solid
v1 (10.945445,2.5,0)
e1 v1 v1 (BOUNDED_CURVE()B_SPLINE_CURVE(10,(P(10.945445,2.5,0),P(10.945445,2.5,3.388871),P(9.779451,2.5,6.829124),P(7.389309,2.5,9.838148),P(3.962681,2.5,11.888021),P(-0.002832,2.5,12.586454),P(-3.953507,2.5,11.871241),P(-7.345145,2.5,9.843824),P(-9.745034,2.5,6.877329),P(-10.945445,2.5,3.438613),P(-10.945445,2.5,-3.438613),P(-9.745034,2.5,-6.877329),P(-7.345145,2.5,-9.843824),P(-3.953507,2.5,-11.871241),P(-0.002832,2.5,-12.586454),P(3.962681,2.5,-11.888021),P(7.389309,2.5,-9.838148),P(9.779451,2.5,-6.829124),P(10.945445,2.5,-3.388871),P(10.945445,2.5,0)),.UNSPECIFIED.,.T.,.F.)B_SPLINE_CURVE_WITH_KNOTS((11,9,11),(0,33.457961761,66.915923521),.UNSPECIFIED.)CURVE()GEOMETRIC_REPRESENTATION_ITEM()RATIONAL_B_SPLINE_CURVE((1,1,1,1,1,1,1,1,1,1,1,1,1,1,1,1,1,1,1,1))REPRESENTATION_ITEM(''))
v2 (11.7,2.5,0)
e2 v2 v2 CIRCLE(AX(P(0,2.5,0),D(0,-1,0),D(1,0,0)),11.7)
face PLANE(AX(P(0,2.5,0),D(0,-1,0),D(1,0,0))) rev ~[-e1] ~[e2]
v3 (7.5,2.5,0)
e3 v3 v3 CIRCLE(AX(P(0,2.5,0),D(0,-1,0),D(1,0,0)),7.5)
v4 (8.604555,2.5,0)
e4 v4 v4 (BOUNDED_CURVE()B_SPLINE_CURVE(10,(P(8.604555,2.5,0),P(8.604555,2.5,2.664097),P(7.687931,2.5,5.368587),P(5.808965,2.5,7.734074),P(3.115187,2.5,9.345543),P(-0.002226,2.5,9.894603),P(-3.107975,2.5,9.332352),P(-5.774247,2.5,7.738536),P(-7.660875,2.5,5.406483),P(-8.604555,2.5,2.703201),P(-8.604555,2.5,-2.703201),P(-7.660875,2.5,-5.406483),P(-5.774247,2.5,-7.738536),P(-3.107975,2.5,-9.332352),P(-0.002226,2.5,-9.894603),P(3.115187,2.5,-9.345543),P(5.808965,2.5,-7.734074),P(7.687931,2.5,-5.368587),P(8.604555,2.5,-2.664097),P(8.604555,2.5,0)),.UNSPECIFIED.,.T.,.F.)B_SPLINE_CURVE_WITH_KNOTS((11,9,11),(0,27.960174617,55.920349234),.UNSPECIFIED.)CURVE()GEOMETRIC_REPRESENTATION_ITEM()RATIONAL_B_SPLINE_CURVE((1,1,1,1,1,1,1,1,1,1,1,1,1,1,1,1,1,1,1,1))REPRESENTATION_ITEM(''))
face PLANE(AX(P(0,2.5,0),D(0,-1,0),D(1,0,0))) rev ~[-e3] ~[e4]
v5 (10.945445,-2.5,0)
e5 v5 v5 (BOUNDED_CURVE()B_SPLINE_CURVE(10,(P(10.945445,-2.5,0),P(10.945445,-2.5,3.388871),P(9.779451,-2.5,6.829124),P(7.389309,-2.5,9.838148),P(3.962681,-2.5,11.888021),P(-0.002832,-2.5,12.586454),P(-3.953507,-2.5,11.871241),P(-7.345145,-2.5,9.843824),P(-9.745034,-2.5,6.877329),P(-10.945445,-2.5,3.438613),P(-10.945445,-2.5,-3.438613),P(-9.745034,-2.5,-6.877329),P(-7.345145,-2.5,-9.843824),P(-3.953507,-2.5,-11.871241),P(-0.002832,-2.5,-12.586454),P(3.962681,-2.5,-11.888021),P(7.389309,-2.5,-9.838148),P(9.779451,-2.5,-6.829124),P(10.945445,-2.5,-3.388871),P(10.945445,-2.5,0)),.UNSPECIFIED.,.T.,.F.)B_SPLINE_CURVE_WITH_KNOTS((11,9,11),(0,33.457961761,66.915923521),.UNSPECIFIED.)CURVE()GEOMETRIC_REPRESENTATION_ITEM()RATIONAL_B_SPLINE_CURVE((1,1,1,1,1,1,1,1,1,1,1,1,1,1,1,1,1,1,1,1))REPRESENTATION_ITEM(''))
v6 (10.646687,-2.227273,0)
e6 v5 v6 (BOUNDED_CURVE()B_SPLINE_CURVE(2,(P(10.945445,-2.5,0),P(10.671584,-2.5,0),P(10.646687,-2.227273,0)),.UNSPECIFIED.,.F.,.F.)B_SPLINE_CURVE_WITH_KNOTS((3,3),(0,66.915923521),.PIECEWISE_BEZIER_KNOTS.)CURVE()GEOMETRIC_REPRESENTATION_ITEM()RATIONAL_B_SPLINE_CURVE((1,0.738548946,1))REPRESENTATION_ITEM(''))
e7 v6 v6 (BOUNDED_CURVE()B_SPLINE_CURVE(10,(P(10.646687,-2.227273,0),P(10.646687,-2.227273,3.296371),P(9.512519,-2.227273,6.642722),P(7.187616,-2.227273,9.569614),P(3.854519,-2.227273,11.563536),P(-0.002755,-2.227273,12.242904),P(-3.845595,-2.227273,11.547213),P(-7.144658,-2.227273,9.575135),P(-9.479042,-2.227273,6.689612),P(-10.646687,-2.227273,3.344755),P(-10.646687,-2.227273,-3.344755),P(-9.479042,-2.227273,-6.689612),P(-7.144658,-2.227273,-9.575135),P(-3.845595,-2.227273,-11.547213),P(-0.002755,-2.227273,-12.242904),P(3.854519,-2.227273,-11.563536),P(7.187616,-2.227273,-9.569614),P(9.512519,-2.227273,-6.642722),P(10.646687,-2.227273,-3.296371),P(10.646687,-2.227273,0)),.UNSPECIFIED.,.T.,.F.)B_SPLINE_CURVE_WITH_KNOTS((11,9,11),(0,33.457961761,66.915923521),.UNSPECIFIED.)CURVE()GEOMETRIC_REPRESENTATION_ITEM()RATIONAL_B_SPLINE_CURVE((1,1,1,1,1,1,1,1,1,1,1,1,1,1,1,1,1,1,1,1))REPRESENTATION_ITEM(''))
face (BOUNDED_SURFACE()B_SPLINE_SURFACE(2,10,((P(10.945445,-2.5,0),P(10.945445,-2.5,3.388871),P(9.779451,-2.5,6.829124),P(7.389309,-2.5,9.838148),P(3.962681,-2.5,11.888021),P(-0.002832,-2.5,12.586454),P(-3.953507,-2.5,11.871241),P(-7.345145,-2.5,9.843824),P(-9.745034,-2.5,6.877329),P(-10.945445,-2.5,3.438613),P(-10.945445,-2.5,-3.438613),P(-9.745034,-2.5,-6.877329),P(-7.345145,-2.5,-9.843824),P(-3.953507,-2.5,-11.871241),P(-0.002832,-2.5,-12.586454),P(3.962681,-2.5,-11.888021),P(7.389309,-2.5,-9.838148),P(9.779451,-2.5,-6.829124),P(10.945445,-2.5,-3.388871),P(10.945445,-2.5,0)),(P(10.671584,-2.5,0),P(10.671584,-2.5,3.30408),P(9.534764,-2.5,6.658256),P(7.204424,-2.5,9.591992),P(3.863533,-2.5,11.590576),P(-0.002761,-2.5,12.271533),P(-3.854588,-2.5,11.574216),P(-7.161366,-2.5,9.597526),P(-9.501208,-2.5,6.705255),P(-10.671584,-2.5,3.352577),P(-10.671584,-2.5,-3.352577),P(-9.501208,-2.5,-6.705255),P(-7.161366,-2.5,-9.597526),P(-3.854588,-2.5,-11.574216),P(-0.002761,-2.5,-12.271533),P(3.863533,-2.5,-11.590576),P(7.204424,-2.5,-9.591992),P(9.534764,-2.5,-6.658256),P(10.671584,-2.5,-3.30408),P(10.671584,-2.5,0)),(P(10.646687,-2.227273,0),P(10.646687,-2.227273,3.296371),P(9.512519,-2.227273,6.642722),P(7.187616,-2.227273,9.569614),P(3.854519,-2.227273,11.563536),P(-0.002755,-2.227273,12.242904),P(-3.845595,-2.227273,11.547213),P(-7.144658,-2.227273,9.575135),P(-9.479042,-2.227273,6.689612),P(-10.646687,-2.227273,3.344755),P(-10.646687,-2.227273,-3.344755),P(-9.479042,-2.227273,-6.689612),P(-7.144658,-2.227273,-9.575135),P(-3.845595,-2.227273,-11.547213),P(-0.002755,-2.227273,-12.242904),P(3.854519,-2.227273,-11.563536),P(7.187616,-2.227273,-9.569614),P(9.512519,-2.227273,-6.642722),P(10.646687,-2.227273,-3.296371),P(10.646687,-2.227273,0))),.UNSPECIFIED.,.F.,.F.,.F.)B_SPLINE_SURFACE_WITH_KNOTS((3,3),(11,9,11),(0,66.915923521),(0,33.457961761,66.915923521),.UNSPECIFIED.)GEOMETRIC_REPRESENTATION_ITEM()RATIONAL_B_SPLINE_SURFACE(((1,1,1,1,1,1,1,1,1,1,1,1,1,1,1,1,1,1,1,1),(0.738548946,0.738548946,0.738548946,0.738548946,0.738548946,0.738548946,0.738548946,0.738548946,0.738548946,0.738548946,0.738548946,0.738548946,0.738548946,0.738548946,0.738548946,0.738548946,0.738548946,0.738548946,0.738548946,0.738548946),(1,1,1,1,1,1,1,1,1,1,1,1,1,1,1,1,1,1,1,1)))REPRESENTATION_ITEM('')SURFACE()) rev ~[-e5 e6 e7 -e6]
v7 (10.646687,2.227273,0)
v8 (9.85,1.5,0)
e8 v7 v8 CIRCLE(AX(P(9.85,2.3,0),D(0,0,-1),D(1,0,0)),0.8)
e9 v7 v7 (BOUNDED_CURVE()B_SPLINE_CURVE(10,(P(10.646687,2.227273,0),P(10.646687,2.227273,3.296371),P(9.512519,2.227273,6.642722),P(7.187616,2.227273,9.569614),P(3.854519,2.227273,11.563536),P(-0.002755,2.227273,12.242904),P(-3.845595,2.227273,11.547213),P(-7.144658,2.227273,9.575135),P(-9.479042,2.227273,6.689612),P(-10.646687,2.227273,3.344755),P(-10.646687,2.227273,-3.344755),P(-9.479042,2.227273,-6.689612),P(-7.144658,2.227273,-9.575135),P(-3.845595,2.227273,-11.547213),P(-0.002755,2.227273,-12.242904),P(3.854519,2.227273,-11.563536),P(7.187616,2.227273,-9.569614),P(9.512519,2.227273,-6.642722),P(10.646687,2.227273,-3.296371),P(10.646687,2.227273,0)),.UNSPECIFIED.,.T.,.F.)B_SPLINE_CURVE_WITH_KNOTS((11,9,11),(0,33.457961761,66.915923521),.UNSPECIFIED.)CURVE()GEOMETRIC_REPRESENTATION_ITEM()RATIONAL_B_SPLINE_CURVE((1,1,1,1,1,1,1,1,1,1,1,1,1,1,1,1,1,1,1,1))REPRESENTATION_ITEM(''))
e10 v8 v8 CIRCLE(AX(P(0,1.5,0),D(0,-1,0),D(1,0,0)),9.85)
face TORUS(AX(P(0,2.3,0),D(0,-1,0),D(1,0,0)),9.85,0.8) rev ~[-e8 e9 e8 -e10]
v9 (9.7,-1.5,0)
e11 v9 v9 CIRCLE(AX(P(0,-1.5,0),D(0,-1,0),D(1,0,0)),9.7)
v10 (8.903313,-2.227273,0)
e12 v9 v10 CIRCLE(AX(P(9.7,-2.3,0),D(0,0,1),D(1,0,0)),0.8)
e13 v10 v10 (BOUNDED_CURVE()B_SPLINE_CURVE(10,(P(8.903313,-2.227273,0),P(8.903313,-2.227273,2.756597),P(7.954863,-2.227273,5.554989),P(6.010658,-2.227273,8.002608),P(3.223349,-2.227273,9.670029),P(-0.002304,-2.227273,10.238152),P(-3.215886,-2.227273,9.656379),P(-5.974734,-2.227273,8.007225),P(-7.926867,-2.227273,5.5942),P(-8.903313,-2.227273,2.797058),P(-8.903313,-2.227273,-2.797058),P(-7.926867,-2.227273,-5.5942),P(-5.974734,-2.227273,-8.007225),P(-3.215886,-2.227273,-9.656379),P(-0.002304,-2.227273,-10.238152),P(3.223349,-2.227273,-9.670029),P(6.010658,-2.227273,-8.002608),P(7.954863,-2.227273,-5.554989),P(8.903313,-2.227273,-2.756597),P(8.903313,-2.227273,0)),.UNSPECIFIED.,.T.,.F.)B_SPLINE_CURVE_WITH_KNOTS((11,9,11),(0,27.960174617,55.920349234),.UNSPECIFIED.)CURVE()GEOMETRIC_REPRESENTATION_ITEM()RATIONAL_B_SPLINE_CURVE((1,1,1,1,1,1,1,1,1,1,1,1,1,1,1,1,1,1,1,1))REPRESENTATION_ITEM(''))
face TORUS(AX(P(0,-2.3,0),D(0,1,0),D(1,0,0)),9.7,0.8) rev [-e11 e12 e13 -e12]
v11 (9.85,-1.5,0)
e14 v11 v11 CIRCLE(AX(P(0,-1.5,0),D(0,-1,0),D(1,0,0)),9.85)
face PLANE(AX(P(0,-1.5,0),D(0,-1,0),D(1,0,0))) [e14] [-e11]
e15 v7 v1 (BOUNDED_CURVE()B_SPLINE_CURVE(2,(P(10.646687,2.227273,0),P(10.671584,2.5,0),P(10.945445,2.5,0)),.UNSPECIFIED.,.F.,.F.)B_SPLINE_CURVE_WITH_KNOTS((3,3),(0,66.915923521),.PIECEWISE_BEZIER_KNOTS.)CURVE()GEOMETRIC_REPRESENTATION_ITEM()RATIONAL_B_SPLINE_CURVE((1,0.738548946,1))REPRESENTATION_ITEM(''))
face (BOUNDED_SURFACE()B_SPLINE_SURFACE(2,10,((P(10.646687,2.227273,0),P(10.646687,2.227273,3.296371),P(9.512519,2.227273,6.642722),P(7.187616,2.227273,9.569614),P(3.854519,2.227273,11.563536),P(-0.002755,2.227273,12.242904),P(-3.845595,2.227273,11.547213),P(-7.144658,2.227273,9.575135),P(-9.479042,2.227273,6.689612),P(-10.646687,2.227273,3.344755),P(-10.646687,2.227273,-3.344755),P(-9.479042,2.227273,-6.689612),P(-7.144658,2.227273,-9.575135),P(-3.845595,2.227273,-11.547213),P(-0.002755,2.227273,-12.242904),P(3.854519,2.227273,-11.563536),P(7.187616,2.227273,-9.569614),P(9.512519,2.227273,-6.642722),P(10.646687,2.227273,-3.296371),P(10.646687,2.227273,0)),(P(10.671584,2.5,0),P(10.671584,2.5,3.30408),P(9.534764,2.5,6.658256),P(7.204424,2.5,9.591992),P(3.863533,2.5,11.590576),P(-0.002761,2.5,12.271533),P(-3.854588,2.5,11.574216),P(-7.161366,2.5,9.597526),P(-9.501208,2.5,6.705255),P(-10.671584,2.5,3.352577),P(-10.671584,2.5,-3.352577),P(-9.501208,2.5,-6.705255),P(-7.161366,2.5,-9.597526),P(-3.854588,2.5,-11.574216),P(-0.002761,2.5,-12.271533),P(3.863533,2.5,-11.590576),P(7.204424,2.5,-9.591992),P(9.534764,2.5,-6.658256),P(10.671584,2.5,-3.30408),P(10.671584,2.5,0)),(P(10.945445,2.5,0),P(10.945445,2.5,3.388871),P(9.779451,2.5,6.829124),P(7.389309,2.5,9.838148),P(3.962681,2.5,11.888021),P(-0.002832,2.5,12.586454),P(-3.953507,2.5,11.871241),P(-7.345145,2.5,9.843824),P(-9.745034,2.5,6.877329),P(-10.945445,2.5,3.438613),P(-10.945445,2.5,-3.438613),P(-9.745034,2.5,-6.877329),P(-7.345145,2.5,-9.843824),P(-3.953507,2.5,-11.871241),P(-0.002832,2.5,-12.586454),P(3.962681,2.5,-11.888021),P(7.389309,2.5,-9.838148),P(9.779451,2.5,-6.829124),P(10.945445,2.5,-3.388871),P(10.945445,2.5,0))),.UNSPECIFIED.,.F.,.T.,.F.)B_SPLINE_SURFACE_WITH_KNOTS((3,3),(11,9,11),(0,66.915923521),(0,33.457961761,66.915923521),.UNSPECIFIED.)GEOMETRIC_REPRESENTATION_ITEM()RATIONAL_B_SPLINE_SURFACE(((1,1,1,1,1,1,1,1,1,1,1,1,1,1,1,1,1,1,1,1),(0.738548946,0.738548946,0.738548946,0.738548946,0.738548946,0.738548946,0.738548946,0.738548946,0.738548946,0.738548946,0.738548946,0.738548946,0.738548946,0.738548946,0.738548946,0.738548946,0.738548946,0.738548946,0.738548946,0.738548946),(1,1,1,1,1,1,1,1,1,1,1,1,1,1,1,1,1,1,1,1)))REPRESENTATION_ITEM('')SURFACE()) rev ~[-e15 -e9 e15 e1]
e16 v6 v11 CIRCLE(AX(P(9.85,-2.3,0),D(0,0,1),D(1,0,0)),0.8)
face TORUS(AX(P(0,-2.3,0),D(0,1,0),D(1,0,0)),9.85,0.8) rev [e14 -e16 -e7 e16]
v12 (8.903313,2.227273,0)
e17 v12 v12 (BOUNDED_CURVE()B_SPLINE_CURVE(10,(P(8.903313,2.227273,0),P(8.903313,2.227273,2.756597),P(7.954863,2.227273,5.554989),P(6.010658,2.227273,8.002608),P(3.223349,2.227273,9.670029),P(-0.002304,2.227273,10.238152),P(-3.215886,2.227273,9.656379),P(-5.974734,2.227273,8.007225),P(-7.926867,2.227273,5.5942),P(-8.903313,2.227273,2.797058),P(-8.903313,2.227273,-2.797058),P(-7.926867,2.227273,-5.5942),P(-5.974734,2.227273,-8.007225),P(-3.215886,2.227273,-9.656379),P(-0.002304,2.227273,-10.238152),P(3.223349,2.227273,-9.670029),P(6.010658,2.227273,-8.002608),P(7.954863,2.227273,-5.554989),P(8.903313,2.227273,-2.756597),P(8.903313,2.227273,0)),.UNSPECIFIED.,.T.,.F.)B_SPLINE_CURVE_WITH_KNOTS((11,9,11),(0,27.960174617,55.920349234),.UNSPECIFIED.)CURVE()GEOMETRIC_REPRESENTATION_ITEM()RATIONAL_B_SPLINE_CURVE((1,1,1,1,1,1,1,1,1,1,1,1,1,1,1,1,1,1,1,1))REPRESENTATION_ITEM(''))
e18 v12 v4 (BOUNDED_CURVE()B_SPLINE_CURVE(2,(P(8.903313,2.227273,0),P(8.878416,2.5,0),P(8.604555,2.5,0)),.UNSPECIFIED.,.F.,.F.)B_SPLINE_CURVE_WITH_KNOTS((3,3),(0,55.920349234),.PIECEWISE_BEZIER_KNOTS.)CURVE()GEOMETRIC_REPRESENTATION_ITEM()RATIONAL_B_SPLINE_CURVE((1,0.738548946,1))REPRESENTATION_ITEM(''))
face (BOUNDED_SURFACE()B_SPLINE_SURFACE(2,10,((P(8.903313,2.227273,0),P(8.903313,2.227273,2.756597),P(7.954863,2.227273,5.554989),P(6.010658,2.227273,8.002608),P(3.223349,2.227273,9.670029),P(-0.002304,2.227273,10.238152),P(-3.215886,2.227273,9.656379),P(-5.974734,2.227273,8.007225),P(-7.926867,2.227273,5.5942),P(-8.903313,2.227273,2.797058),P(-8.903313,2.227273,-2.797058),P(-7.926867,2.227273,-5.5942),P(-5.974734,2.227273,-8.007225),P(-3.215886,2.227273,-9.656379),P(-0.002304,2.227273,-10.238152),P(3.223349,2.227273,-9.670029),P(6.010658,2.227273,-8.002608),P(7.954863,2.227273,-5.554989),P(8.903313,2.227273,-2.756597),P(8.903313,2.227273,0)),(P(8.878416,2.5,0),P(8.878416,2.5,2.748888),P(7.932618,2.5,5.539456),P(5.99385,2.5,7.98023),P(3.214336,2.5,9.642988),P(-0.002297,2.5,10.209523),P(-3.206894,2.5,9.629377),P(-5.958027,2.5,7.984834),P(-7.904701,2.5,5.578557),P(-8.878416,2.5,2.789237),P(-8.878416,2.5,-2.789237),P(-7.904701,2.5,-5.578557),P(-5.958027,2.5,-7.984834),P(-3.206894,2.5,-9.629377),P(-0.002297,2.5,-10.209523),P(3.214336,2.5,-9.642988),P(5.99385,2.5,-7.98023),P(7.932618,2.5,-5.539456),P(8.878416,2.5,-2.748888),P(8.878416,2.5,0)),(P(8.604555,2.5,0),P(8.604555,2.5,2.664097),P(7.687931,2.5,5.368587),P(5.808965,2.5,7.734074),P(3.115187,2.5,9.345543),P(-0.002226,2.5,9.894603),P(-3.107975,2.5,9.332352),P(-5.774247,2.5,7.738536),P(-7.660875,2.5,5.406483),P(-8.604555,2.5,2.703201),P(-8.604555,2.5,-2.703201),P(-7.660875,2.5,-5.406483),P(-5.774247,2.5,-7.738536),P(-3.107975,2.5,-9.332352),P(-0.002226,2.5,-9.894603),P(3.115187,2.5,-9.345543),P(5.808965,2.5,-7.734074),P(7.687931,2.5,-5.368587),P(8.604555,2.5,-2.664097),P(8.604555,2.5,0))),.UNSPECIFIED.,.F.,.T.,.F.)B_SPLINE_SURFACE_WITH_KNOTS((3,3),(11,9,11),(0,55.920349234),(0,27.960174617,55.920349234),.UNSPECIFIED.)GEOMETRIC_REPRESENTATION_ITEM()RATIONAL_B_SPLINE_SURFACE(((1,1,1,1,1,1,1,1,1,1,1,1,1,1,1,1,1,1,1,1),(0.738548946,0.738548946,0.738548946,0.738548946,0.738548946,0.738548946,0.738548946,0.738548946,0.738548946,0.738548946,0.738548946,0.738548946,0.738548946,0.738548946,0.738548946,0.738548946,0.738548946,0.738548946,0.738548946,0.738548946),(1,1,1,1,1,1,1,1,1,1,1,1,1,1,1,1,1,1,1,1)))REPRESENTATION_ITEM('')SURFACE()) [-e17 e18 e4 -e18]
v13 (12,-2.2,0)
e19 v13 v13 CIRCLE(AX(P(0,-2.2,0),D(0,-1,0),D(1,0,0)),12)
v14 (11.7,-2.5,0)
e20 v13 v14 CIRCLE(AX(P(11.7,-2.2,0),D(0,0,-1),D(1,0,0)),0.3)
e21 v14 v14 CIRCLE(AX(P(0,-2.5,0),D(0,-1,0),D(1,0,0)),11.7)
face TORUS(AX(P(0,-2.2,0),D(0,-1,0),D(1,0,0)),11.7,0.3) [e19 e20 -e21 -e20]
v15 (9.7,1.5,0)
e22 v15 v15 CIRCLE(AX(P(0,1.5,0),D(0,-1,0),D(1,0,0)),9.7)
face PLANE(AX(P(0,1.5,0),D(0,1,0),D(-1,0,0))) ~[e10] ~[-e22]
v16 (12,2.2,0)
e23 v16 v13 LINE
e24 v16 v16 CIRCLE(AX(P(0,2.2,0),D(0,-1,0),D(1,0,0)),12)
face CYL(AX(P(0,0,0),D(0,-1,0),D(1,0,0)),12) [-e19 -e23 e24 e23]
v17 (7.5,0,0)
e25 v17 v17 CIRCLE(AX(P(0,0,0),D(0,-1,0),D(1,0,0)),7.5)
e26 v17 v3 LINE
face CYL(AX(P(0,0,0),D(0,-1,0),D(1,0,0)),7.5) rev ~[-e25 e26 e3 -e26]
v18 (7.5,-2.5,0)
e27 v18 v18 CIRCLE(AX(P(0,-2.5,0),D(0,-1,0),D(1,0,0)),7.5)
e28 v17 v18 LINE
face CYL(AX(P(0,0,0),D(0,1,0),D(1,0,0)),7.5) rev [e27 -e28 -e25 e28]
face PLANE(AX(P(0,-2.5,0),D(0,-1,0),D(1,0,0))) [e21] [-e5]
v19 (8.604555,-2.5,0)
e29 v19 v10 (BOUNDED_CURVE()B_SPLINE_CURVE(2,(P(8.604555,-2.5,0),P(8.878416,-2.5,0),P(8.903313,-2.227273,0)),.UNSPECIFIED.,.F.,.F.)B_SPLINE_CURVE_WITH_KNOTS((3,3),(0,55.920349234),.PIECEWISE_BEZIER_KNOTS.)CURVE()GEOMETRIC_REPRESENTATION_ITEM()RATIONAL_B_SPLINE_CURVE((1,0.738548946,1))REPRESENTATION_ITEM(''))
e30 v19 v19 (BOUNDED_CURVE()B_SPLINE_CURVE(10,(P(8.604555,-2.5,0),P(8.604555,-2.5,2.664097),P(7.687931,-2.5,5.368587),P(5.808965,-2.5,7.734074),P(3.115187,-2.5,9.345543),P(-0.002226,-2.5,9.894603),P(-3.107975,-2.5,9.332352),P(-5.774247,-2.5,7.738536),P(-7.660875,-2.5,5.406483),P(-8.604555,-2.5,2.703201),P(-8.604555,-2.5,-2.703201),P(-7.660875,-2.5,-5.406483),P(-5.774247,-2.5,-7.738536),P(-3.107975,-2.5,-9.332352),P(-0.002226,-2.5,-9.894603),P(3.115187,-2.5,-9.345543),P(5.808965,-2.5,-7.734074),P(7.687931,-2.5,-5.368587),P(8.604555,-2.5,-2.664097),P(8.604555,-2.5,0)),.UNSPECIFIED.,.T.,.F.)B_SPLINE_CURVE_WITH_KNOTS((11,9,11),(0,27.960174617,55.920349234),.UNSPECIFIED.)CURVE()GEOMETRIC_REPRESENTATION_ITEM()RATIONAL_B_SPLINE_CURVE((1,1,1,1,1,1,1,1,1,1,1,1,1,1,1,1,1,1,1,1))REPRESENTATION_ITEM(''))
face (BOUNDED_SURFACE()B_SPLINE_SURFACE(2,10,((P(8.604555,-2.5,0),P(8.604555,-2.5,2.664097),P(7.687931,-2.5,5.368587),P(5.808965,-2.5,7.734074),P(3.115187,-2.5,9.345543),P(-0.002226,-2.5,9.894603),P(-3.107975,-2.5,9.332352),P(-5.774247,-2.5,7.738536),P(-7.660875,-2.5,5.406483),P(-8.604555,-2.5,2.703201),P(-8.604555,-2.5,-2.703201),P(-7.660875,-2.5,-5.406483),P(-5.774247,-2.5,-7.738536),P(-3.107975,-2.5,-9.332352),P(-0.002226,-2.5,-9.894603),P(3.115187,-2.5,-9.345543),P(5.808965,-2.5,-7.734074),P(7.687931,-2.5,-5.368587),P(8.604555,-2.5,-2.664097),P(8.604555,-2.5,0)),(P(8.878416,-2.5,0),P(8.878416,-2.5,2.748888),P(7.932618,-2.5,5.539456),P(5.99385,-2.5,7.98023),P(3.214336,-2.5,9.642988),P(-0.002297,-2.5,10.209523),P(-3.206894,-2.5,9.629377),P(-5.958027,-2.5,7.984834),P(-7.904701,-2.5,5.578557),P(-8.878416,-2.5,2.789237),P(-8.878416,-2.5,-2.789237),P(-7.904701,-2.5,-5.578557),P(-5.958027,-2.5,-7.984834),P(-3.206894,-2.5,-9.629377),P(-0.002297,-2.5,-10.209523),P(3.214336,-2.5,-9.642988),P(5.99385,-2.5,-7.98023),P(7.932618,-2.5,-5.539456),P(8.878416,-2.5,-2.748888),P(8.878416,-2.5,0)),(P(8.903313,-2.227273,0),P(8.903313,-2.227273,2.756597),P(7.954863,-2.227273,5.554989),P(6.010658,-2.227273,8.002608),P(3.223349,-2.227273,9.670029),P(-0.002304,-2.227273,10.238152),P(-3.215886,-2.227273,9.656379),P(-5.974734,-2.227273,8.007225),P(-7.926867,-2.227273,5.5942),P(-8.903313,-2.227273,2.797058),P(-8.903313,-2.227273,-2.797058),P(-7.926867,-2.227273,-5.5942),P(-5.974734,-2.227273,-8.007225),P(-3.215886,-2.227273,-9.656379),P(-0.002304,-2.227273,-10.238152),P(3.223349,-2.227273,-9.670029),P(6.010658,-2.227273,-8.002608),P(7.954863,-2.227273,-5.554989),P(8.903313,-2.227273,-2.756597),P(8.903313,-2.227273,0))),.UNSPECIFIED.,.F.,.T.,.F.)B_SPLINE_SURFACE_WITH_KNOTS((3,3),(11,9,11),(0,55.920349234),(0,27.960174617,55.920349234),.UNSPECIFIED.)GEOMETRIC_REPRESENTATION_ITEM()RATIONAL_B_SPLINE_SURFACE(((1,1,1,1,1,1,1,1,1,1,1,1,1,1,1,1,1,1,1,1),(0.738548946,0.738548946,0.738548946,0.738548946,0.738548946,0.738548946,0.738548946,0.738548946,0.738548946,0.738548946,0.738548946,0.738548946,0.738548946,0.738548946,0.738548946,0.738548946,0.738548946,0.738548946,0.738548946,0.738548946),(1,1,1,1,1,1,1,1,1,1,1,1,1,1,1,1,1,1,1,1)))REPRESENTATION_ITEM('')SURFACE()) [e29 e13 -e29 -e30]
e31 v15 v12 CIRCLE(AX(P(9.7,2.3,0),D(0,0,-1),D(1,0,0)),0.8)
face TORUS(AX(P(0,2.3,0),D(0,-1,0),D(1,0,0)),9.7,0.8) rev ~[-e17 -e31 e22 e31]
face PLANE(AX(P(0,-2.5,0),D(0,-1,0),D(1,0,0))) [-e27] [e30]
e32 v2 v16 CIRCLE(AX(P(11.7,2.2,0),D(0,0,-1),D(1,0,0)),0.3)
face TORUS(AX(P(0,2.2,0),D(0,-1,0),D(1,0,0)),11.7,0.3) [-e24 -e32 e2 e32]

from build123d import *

# Parameters (mm, degrees)
F0_R          = 12
F0_R_2        = 7.5
F1_DEPTH      = 2.5
F1_DEPTH_BACK = 2.5
F2_R          = 10.65
F2_R_2        = 8.9
F3_DEPTH      = 1
F4_R          = 0.8
F5_R          = 0.3


# Not quite as in the source:
# - a pattern or mirror of a feature is missing from the dataset's text; its kind, count and spacing are read off the source's solid


with BuildPart() as f1:
    # F0 (on Front) → F1 (new body, two sides)
    with BuildSketch(Plane.XZ) as f1_sk:
        Circle(F0_R)
        Circle(F0_R_2, mode=Mode.SUBTRACT)
    extrude(amount=F1_DEPTH)
    extrude(f1_sk.sketch, amount=-F1_DEPTH_BACK)

    # F2 (on face) → F3 (cut)
    with BuildSketch(Plane.XZ.offset(2.5)):
        Circle(F2_R)
        Circle(F2_R_2, mode=Mode.SUBTRACT)
    f3 = extrude(amount=-F3_DEPTH, mode=Mode.SUBTRACT)

    # F3_copies: F3 across plane
    add(f3.mirror(Plane.ZX), mode=Mode.SUBTRACT)

    # F4
    f4_edges = [f1.edges().sort_by_distance(p)[0] for p in [
        (-8.9, -1.5, 0),
        (-10.65, -1.5, 0),
        (-10.65, 1.5, 0),
        (-8.9, 1.5, 0),
    ]]
    fillet(f4_edges, radius=F4_R)

    # F5
    f5_edges = [f1.edges().sort_by_distance(p)[0] for p in [
        (-10.65, -2.5, 0),
        (-12, -2.5, 0),
        (-8.9, -2.5, 0),
        (-12, 2.5, 0),
        (-10.65, 2.5, 0),
        (-8.9, 2.5, 0),
    ]]
    fillet(f5_edges, radius=F5_R)


solid = f1.part
